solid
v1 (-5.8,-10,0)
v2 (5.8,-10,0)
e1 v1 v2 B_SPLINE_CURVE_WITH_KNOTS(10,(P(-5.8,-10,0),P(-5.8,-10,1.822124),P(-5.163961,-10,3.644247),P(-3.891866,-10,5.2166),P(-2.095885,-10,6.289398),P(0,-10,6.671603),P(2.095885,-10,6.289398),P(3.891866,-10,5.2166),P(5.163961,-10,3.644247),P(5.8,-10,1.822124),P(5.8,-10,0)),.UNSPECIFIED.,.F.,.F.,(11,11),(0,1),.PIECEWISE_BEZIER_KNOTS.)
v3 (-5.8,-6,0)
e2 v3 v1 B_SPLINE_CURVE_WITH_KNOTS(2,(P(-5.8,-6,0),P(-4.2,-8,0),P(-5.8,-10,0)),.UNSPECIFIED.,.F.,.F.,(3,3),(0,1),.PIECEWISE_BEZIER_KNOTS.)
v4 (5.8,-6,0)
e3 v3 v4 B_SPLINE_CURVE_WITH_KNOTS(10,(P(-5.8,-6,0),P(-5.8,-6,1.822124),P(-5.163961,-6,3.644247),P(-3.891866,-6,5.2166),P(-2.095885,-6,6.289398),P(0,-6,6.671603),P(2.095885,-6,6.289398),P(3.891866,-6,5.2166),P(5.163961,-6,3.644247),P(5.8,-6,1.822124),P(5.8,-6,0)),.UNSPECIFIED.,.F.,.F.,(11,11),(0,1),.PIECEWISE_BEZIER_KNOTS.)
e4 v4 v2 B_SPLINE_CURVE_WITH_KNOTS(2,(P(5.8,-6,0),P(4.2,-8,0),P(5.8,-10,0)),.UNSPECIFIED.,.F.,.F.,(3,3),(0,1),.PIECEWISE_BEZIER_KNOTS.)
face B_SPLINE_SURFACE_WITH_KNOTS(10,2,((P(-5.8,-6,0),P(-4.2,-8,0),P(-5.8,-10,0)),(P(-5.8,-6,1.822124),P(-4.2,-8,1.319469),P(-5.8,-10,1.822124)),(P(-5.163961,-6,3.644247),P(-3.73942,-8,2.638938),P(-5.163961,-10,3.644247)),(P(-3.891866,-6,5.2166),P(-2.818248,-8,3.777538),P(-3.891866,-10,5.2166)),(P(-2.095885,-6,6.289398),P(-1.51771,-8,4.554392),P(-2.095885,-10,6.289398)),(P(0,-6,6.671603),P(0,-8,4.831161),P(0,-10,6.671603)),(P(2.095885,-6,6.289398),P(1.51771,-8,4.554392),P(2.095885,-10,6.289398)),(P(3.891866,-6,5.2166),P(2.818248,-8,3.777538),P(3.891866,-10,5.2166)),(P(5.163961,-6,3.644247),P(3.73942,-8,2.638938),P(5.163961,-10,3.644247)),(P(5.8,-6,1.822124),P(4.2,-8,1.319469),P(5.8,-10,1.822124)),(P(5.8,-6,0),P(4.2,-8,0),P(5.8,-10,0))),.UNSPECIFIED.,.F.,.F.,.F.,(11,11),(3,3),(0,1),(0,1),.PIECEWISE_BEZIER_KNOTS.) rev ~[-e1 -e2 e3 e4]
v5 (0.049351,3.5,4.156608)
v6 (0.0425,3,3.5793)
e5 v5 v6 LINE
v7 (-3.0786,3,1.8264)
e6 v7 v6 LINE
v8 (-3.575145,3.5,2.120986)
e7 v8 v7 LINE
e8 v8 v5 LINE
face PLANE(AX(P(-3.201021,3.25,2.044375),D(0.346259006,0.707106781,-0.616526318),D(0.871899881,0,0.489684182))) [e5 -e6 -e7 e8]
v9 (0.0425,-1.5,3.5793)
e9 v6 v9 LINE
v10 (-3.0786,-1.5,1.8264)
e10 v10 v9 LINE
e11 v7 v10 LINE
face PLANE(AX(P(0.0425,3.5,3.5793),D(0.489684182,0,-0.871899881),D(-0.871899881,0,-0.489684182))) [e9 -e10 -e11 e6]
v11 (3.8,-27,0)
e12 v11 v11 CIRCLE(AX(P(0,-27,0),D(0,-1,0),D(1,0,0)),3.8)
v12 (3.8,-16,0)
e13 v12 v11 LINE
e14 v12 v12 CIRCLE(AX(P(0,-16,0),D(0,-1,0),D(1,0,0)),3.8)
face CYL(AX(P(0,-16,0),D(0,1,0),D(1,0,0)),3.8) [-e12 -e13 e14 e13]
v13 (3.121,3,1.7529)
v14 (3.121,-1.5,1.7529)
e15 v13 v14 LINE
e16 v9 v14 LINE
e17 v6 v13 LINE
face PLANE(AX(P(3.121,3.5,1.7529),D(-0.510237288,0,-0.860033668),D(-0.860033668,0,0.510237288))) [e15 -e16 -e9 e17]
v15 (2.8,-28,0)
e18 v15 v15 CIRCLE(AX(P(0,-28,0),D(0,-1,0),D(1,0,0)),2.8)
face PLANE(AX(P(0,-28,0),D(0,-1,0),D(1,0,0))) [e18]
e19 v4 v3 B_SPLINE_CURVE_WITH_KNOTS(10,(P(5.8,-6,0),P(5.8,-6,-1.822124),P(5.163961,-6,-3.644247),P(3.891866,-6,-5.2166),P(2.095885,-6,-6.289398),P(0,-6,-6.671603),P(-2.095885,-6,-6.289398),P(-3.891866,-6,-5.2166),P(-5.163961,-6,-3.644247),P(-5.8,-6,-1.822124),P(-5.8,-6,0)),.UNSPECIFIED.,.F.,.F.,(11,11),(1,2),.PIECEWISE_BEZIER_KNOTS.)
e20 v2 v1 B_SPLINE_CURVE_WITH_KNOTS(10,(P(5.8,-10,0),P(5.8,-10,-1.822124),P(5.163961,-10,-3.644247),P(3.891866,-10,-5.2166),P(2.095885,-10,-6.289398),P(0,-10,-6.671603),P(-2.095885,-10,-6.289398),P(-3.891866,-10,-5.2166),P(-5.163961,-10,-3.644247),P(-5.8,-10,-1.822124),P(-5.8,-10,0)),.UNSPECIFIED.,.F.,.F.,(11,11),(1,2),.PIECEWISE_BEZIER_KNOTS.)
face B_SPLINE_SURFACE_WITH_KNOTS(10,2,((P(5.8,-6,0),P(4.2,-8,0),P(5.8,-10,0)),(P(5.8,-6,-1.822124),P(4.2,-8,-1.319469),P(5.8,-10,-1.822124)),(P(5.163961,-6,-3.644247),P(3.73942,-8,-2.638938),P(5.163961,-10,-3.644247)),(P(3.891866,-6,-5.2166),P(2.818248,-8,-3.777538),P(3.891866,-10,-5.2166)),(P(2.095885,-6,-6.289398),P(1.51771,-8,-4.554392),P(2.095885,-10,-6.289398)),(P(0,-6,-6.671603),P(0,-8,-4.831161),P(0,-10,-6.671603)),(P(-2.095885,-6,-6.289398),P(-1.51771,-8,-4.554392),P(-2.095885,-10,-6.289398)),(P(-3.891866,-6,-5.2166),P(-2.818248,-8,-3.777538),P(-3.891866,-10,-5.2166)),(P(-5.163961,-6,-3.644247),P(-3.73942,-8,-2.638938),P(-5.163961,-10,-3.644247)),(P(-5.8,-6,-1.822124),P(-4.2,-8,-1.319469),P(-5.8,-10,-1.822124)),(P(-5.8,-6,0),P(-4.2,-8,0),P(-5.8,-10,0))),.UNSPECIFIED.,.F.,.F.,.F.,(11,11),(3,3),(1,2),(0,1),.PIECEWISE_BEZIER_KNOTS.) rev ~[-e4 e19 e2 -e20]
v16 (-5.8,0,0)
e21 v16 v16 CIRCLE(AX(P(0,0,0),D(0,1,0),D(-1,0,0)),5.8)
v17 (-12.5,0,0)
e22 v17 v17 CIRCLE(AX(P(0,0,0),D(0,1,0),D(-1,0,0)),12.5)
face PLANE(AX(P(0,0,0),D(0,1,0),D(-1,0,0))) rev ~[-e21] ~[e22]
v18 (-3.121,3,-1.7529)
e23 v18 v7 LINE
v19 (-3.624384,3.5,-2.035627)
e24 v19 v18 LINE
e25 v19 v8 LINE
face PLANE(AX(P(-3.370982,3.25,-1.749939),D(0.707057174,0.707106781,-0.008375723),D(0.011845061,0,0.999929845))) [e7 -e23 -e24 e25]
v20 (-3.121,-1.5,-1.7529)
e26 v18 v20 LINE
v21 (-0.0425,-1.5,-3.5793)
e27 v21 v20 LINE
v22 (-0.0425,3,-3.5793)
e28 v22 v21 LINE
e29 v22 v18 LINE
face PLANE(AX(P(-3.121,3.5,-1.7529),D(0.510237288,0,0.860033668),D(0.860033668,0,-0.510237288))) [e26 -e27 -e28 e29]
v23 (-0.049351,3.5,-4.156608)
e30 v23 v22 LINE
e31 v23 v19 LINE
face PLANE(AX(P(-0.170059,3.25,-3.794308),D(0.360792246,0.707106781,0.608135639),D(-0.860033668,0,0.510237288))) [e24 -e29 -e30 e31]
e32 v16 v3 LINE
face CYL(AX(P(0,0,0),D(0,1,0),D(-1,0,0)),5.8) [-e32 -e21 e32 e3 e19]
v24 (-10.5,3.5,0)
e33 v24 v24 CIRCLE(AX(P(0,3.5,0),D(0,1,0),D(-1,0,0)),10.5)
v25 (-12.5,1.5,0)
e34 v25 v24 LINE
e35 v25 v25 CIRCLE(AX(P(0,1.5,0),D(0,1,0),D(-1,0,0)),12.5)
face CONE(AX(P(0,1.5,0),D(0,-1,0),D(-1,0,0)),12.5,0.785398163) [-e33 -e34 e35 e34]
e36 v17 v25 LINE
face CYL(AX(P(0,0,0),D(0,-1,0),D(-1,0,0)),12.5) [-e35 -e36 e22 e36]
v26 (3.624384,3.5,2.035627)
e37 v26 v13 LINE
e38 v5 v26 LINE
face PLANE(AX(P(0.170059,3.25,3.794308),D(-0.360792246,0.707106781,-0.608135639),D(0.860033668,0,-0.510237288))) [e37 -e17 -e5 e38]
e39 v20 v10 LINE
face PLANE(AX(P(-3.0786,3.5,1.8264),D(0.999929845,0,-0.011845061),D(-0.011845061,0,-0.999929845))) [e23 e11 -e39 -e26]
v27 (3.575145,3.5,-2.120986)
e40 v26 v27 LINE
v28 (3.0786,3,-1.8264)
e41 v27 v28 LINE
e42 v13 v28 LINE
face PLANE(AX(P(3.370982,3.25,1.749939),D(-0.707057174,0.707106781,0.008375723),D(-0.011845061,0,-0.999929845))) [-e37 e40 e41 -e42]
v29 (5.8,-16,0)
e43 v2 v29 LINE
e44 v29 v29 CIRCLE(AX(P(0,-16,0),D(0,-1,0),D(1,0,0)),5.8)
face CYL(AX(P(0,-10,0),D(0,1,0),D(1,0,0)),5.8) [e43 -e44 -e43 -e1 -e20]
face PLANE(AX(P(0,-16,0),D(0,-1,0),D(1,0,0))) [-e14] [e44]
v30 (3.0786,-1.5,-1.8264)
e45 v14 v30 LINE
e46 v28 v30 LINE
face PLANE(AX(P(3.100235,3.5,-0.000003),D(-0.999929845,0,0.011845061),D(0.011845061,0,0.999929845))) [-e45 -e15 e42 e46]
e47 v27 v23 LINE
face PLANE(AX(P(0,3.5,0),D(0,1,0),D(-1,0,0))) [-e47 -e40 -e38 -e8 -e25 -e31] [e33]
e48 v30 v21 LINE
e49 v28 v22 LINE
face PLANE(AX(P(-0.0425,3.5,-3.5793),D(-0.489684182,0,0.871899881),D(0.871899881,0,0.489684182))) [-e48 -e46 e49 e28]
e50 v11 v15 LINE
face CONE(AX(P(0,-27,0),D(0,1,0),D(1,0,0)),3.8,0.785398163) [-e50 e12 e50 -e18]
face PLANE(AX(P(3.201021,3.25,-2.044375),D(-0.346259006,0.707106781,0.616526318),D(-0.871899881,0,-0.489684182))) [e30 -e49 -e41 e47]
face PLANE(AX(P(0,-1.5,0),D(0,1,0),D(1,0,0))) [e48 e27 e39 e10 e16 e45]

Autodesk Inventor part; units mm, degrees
sketch "草图1" plane through (0, 0, 0) normal (0, 1, 0) x (-1, 0, 0)
  circle A0 centre (0, 0) radius 12.5
  circle A1 centre (0, 0) radius 5.8
  dimension "d0" = 25
  dimension "d1" = 11.6
extrude "拉伸1" add sketch "草图1" along normal blind 3.5 contours A0 | A1
extrude "拉伸2" add sketch "草图1" against normal blind 6 contours A1
ref_plane "工作平面2" through (0, -8, 0) normal (0, -1, 0) x (1, 0, 0)
sketch "草图3" plane through (0, -8, 0) normal (0, -1, 0) x (1, 0, 0)
  circle A0 centre (0, 0) radius 5
  dimension "d10" = 10
ref_plane "工作平面1" through (0, -10, 0) normal (0, -1, 0) x (1, 0, 0)
sketch "草图2" plane through (0, -10, 0) normal (0, -1, 0) x (1, 0, 0)
  circle A0 centre (0, 0) radius 5.8 projected
extrude "拉伸3" add sketch "草图2" along normal blind 6
loft "放样1" add profiles "草图3" section 1 edges at (5.8, -6, 0) section 3 edges at (-5.8, -10, 0)
ref_plane "工作平面3" through (0, -16, 0) normal (0, -1, 0) x (1, 0, 0)
sketch "草图4" plane through (0, -16, 0) normal (0, -1, 0) x (1, 0, 0)
  circle A0 centre (0, 0) radius 3.8
  dimension "d18" = 7.6
extrude "拉伸4" add sketch "草图4" along normal blind 12
chamfer "倒角1" distance 1 angle 45 1 edges at (-3.8, -28, 0)
chamfer "倒角2" distance 2 angle 45 1 edges at (12.5, 3.5, 0)
sketch "草图5" plane through (0, 3.5, 0) normal (0, 1, 0) x (1, 0, 0)
  circle A0 centre (0, 0) radius 3.1
  line L0 (-3.0786, -1.8264) -> (-3.121, 1.7529)
  line L1 (-3.121, 1.7529) -> (-0.0425, 3.5793)
  line L2 (-0.0425, 3.5793) -> (3.0786, 1.8264)
  line L3 (3.0786, 1.8264) -> (3.121, -1.7529)
  line L4 (3.121, -1.7529) -> (0.0425, -3.5793)
  line L5 (0.0425, -3.5793) -> (-3.0786, -1.8264)
  dimension "d29" = 6.2
extrude "拉伸5" cut sketch "草图5" against normal blind 5
chamfer "倒角3" distance 0.5 angle 45 6 edges at (3.0998, 3.5, -0.0368) (1.5181, 3.5, -2.7029) (-1.5817, 3.5, -2.6661) (-3.0998, 3.5, 0.0368) (-1.5181, 3.5, 2.7029) (1.5817, 3.5, 2.6661)
thread "螺纹2" size "M8x1.25" class "6g" standard "ISO Metric profile" length 11
properties part number "Spindle_Screw"
